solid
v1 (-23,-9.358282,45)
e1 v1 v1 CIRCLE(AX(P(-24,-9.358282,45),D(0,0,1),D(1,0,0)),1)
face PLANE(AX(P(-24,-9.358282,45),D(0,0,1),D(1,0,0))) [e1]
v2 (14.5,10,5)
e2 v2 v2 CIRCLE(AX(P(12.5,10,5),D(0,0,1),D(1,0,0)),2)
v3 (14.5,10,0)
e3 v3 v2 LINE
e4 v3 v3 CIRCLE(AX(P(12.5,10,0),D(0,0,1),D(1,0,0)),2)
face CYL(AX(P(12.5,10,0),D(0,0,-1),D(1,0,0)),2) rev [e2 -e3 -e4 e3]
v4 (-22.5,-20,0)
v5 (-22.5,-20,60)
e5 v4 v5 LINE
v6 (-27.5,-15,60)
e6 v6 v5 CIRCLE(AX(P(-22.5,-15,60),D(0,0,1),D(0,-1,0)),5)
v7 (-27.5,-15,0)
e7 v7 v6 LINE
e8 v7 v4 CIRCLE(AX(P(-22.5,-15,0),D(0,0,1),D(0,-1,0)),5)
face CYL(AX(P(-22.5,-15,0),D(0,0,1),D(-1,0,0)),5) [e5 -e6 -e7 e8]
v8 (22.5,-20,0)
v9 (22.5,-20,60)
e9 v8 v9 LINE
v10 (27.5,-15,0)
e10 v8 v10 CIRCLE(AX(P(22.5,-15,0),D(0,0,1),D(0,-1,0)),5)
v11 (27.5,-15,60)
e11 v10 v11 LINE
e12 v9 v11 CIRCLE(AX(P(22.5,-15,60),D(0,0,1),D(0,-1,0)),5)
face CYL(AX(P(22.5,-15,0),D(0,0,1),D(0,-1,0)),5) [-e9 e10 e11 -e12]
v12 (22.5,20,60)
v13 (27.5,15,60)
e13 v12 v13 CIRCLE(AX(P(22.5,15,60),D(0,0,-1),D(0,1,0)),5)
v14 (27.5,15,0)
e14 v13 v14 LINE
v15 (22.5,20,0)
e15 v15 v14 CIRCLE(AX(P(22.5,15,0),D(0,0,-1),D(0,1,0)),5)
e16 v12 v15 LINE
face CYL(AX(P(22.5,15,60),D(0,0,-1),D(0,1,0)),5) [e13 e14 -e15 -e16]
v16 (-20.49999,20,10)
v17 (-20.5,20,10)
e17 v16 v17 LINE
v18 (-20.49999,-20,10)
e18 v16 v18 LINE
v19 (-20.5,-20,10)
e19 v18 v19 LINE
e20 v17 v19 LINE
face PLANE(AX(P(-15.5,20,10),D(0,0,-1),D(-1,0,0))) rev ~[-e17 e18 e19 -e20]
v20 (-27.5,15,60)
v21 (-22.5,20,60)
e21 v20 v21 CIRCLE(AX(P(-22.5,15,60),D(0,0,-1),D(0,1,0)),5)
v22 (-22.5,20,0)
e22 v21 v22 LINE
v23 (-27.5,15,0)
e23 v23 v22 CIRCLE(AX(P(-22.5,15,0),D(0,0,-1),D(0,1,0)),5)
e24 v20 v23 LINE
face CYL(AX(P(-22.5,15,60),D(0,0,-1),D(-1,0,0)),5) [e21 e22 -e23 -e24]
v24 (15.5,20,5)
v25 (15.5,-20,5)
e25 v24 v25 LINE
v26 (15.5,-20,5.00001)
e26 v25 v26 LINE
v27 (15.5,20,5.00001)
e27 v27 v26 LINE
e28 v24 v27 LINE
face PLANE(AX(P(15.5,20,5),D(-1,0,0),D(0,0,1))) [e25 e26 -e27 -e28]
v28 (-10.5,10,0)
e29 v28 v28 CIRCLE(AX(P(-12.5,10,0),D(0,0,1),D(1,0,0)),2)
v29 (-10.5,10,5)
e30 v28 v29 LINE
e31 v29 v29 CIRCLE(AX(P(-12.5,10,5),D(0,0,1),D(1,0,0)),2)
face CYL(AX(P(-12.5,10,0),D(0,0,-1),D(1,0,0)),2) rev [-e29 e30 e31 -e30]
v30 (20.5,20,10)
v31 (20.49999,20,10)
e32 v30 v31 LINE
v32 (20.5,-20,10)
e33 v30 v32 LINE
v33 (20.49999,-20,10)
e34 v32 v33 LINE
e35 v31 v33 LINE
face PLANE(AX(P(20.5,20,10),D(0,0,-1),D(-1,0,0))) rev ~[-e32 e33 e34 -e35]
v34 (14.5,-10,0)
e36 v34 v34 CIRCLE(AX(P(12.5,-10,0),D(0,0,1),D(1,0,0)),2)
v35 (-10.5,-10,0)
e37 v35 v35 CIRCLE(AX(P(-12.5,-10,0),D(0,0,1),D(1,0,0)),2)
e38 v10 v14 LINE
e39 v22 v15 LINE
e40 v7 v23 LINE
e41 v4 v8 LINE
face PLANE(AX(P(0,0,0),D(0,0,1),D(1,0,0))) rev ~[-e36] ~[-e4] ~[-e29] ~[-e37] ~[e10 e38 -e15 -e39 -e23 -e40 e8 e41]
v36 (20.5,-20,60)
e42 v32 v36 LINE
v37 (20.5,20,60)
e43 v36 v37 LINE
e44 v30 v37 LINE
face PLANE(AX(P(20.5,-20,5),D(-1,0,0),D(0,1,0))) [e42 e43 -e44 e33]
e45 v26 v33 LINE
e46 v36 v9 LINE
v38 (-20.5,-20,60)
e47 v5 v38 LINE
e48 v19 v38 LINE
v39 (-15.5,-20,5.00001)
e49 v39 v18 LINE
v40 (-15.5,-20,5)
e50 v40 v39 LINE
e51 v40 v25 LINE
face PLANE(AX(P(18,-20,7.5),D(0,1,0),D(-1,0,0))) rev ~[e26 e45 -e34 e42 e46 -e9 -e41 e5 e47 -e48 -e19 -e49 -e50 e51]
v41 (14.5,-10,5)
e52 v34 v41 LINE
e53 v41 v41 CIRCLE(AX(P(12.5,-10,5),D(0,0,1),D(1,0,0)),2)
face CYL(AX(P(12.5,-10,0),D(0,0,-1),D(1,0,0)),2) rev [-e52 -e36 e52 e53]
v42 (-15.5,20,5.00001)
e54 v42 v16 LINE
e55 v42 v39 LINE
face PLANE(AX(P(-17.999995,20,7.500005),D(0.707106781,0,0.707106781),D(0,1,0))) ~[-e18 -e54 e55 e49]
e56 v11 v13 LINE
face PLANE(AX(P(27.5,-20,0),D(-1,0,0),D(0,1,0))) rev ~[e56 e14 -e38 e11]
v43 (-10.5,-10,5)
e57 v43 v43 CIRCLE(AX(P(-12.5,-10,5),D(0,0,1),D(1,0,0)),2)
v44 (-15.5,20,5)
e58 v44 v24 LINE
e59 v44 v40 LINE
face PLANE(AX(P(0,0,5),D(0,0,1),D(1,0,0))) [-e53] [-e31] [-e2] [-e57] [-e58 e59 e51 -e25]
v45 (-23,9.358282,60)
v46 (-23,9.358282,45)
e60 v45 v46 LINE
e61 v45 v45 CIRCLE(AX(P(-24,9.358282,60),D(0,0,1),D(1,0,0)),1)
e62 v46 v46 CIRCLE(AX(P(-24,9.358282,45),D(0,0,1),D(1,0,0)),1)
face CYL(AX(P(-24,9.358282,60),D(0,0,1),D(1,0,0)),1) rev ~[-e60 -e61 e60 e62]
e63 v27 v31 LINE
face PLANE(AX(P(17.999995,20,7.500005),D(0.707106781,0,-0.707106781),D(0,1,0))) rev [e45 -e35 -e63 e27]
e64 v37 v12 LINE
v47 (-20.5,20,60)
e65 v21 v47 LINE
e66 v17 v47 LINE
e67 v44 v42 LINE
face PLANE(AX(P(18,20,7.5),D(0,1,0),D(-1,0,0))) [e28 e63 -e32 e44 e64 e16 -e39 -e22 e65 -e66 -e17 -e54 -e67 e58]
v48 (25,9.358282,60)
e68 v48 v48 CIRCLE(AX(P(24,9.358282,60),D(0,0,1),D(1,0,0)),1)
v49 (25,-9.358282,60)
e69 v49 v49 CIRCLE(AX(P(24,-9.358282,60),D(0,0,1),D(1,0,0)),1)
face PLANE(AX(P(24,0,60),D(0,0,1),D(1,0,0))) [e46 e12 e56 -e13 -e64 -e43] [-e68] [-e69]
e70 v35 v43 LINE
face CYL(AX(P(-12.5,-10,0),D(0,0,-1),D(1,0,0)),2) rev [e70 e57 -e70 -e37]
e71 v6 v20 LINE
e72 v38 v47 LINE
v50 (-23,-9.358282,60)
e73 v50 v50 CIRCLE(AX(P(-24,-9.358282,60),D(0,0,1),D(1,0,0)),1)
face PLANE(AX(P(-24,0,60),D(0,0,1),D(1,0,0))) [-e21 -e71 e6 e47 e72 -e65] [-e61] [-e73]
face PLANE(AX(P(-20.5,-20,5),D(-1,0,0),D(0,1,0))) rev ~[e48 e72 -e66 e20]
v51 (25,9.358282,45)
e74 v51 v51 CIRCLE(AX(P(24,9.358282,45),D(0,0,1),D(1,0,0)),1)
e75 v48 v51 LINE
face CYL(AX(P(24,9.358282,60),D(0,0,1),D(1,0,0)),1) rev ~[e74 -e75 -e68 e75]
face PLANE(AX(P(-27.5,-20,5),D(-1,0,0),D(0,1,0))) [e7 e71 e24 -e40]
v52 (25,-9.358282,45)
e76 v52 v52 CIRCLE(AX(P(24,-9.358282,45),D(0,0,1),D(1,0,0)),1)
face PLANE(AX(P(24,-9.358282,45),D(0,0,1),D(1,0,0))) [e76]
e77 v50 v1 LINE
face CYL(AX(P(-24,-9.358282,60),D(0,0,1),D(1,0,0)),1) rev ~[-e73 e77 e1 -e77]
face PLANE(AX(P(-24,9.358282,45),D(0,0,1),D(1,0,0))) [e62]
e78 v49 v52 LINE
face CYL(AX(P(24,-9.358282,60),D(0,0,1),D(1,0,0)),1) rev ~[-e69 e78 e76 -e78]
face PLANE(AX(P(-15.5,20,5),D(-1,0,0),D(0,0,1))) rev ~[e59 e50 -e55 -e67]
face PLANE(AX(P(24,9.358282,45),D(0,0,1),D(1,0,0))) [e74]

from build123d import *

# Parameters (mm, degrees)
F0_W     = 55
F0_H     = 40
F0_R     = 2
F1_DEPTH = 5
F2_W     = 7
F2_H     = 40
F3_DEPTH = 55
F4_R     = 1
F5_DEPTH = 15
F6_R     = 5
F7_W     = 5
F7_H     = 5
F8_DEPTH = 40
F9_SIZE  = 4.99999


# Not quite as in the source:
# - a fillet or chamfer is up to 0.001 mm smaller than in the source, because OpenCascade refuses the exact size


with BuildPart() as f1:
    # F0 (on Top) → F1 (new body)
    with BuildSketch(Plane.XY):
        Rectangle(F0_W, F0_H)
        with Locations((-12.5, -10)):
            Circle(F0_R, mode=Mode.SUBTRACT)
        with Locations((12.5, -10)):
            Circle(F0_R, mode=Mode.SUBTRACT)
        with Locations((-12.5, 10)):
            Circle(F0_R, mode=Mode.SUBTRACT)
        with Locations((12.5, 10)):
            Circle(F0_R, mode=Mode.SUBTRACT)
    extrude(amount=F1_DEPTH)

    # F2 (on face) → F3 (join)
    with BuildSketch(Plane.XY.offset(5)):
        with Locations((-24, 0)):
            Rectangle(F2_W, F2_H)
        with Locations((24, 0)):
            Rectangle(F2_W, F2_H)
    extrude(amount=F3_DEPTH)

    # F4 (on face) → F5 (cut)
    with BuildSketch(Plane.XY.offset(60)):
        with Locations((-24, 9.358282201)):
            Circle(F4_R)
        with Locations((24, 9.358282201)):
            Circle(F4_R)
        with Locations((24, -9.358282201)):
            Circle(F4_R)
        with Locations((-24, -9.358282201)):
            Circle(F4_R)
    extrude(amount=-F5_DEPTH, mode=Mode.SUBTRACT)

    # F6
    f6_edges = [f1.edges().sort_by_distance(p)[0] for p in [
        (-27.5, 20, 30),
        (-27.5, -20, 30),
        (27.5, -20, 30),
        (27.5, 20, 30),
    ]]
    fillet(f6_edges, radius=F6_R)

    # F7 (on face) → F8 (join)
    with BuildSketch(Plane(origin=(0, 20, 0), x_dir=(-1, 0, 0), z_dir=(0, 1, 0))):
        with Locations((-18, 7.5)):
            Rectangle(F7_W, F7_H)
        with Locations((18, 7.5)):
            Rectangle(F7_W, F7_H)
    extrude(amount=-F8_DEPTH)

    # F9 (size 5 in the source; OpenCascade refuses exactly that, so slightly less here)
    f9_edges = [f1.edges().sort_by_distance(p)[0] for p in [
        (15.5, 0, 10),
        (-15.5, 0, 10),
    ]]
    chamfer(f9_edges, length=F9_SIZE)


solid = f1.part
